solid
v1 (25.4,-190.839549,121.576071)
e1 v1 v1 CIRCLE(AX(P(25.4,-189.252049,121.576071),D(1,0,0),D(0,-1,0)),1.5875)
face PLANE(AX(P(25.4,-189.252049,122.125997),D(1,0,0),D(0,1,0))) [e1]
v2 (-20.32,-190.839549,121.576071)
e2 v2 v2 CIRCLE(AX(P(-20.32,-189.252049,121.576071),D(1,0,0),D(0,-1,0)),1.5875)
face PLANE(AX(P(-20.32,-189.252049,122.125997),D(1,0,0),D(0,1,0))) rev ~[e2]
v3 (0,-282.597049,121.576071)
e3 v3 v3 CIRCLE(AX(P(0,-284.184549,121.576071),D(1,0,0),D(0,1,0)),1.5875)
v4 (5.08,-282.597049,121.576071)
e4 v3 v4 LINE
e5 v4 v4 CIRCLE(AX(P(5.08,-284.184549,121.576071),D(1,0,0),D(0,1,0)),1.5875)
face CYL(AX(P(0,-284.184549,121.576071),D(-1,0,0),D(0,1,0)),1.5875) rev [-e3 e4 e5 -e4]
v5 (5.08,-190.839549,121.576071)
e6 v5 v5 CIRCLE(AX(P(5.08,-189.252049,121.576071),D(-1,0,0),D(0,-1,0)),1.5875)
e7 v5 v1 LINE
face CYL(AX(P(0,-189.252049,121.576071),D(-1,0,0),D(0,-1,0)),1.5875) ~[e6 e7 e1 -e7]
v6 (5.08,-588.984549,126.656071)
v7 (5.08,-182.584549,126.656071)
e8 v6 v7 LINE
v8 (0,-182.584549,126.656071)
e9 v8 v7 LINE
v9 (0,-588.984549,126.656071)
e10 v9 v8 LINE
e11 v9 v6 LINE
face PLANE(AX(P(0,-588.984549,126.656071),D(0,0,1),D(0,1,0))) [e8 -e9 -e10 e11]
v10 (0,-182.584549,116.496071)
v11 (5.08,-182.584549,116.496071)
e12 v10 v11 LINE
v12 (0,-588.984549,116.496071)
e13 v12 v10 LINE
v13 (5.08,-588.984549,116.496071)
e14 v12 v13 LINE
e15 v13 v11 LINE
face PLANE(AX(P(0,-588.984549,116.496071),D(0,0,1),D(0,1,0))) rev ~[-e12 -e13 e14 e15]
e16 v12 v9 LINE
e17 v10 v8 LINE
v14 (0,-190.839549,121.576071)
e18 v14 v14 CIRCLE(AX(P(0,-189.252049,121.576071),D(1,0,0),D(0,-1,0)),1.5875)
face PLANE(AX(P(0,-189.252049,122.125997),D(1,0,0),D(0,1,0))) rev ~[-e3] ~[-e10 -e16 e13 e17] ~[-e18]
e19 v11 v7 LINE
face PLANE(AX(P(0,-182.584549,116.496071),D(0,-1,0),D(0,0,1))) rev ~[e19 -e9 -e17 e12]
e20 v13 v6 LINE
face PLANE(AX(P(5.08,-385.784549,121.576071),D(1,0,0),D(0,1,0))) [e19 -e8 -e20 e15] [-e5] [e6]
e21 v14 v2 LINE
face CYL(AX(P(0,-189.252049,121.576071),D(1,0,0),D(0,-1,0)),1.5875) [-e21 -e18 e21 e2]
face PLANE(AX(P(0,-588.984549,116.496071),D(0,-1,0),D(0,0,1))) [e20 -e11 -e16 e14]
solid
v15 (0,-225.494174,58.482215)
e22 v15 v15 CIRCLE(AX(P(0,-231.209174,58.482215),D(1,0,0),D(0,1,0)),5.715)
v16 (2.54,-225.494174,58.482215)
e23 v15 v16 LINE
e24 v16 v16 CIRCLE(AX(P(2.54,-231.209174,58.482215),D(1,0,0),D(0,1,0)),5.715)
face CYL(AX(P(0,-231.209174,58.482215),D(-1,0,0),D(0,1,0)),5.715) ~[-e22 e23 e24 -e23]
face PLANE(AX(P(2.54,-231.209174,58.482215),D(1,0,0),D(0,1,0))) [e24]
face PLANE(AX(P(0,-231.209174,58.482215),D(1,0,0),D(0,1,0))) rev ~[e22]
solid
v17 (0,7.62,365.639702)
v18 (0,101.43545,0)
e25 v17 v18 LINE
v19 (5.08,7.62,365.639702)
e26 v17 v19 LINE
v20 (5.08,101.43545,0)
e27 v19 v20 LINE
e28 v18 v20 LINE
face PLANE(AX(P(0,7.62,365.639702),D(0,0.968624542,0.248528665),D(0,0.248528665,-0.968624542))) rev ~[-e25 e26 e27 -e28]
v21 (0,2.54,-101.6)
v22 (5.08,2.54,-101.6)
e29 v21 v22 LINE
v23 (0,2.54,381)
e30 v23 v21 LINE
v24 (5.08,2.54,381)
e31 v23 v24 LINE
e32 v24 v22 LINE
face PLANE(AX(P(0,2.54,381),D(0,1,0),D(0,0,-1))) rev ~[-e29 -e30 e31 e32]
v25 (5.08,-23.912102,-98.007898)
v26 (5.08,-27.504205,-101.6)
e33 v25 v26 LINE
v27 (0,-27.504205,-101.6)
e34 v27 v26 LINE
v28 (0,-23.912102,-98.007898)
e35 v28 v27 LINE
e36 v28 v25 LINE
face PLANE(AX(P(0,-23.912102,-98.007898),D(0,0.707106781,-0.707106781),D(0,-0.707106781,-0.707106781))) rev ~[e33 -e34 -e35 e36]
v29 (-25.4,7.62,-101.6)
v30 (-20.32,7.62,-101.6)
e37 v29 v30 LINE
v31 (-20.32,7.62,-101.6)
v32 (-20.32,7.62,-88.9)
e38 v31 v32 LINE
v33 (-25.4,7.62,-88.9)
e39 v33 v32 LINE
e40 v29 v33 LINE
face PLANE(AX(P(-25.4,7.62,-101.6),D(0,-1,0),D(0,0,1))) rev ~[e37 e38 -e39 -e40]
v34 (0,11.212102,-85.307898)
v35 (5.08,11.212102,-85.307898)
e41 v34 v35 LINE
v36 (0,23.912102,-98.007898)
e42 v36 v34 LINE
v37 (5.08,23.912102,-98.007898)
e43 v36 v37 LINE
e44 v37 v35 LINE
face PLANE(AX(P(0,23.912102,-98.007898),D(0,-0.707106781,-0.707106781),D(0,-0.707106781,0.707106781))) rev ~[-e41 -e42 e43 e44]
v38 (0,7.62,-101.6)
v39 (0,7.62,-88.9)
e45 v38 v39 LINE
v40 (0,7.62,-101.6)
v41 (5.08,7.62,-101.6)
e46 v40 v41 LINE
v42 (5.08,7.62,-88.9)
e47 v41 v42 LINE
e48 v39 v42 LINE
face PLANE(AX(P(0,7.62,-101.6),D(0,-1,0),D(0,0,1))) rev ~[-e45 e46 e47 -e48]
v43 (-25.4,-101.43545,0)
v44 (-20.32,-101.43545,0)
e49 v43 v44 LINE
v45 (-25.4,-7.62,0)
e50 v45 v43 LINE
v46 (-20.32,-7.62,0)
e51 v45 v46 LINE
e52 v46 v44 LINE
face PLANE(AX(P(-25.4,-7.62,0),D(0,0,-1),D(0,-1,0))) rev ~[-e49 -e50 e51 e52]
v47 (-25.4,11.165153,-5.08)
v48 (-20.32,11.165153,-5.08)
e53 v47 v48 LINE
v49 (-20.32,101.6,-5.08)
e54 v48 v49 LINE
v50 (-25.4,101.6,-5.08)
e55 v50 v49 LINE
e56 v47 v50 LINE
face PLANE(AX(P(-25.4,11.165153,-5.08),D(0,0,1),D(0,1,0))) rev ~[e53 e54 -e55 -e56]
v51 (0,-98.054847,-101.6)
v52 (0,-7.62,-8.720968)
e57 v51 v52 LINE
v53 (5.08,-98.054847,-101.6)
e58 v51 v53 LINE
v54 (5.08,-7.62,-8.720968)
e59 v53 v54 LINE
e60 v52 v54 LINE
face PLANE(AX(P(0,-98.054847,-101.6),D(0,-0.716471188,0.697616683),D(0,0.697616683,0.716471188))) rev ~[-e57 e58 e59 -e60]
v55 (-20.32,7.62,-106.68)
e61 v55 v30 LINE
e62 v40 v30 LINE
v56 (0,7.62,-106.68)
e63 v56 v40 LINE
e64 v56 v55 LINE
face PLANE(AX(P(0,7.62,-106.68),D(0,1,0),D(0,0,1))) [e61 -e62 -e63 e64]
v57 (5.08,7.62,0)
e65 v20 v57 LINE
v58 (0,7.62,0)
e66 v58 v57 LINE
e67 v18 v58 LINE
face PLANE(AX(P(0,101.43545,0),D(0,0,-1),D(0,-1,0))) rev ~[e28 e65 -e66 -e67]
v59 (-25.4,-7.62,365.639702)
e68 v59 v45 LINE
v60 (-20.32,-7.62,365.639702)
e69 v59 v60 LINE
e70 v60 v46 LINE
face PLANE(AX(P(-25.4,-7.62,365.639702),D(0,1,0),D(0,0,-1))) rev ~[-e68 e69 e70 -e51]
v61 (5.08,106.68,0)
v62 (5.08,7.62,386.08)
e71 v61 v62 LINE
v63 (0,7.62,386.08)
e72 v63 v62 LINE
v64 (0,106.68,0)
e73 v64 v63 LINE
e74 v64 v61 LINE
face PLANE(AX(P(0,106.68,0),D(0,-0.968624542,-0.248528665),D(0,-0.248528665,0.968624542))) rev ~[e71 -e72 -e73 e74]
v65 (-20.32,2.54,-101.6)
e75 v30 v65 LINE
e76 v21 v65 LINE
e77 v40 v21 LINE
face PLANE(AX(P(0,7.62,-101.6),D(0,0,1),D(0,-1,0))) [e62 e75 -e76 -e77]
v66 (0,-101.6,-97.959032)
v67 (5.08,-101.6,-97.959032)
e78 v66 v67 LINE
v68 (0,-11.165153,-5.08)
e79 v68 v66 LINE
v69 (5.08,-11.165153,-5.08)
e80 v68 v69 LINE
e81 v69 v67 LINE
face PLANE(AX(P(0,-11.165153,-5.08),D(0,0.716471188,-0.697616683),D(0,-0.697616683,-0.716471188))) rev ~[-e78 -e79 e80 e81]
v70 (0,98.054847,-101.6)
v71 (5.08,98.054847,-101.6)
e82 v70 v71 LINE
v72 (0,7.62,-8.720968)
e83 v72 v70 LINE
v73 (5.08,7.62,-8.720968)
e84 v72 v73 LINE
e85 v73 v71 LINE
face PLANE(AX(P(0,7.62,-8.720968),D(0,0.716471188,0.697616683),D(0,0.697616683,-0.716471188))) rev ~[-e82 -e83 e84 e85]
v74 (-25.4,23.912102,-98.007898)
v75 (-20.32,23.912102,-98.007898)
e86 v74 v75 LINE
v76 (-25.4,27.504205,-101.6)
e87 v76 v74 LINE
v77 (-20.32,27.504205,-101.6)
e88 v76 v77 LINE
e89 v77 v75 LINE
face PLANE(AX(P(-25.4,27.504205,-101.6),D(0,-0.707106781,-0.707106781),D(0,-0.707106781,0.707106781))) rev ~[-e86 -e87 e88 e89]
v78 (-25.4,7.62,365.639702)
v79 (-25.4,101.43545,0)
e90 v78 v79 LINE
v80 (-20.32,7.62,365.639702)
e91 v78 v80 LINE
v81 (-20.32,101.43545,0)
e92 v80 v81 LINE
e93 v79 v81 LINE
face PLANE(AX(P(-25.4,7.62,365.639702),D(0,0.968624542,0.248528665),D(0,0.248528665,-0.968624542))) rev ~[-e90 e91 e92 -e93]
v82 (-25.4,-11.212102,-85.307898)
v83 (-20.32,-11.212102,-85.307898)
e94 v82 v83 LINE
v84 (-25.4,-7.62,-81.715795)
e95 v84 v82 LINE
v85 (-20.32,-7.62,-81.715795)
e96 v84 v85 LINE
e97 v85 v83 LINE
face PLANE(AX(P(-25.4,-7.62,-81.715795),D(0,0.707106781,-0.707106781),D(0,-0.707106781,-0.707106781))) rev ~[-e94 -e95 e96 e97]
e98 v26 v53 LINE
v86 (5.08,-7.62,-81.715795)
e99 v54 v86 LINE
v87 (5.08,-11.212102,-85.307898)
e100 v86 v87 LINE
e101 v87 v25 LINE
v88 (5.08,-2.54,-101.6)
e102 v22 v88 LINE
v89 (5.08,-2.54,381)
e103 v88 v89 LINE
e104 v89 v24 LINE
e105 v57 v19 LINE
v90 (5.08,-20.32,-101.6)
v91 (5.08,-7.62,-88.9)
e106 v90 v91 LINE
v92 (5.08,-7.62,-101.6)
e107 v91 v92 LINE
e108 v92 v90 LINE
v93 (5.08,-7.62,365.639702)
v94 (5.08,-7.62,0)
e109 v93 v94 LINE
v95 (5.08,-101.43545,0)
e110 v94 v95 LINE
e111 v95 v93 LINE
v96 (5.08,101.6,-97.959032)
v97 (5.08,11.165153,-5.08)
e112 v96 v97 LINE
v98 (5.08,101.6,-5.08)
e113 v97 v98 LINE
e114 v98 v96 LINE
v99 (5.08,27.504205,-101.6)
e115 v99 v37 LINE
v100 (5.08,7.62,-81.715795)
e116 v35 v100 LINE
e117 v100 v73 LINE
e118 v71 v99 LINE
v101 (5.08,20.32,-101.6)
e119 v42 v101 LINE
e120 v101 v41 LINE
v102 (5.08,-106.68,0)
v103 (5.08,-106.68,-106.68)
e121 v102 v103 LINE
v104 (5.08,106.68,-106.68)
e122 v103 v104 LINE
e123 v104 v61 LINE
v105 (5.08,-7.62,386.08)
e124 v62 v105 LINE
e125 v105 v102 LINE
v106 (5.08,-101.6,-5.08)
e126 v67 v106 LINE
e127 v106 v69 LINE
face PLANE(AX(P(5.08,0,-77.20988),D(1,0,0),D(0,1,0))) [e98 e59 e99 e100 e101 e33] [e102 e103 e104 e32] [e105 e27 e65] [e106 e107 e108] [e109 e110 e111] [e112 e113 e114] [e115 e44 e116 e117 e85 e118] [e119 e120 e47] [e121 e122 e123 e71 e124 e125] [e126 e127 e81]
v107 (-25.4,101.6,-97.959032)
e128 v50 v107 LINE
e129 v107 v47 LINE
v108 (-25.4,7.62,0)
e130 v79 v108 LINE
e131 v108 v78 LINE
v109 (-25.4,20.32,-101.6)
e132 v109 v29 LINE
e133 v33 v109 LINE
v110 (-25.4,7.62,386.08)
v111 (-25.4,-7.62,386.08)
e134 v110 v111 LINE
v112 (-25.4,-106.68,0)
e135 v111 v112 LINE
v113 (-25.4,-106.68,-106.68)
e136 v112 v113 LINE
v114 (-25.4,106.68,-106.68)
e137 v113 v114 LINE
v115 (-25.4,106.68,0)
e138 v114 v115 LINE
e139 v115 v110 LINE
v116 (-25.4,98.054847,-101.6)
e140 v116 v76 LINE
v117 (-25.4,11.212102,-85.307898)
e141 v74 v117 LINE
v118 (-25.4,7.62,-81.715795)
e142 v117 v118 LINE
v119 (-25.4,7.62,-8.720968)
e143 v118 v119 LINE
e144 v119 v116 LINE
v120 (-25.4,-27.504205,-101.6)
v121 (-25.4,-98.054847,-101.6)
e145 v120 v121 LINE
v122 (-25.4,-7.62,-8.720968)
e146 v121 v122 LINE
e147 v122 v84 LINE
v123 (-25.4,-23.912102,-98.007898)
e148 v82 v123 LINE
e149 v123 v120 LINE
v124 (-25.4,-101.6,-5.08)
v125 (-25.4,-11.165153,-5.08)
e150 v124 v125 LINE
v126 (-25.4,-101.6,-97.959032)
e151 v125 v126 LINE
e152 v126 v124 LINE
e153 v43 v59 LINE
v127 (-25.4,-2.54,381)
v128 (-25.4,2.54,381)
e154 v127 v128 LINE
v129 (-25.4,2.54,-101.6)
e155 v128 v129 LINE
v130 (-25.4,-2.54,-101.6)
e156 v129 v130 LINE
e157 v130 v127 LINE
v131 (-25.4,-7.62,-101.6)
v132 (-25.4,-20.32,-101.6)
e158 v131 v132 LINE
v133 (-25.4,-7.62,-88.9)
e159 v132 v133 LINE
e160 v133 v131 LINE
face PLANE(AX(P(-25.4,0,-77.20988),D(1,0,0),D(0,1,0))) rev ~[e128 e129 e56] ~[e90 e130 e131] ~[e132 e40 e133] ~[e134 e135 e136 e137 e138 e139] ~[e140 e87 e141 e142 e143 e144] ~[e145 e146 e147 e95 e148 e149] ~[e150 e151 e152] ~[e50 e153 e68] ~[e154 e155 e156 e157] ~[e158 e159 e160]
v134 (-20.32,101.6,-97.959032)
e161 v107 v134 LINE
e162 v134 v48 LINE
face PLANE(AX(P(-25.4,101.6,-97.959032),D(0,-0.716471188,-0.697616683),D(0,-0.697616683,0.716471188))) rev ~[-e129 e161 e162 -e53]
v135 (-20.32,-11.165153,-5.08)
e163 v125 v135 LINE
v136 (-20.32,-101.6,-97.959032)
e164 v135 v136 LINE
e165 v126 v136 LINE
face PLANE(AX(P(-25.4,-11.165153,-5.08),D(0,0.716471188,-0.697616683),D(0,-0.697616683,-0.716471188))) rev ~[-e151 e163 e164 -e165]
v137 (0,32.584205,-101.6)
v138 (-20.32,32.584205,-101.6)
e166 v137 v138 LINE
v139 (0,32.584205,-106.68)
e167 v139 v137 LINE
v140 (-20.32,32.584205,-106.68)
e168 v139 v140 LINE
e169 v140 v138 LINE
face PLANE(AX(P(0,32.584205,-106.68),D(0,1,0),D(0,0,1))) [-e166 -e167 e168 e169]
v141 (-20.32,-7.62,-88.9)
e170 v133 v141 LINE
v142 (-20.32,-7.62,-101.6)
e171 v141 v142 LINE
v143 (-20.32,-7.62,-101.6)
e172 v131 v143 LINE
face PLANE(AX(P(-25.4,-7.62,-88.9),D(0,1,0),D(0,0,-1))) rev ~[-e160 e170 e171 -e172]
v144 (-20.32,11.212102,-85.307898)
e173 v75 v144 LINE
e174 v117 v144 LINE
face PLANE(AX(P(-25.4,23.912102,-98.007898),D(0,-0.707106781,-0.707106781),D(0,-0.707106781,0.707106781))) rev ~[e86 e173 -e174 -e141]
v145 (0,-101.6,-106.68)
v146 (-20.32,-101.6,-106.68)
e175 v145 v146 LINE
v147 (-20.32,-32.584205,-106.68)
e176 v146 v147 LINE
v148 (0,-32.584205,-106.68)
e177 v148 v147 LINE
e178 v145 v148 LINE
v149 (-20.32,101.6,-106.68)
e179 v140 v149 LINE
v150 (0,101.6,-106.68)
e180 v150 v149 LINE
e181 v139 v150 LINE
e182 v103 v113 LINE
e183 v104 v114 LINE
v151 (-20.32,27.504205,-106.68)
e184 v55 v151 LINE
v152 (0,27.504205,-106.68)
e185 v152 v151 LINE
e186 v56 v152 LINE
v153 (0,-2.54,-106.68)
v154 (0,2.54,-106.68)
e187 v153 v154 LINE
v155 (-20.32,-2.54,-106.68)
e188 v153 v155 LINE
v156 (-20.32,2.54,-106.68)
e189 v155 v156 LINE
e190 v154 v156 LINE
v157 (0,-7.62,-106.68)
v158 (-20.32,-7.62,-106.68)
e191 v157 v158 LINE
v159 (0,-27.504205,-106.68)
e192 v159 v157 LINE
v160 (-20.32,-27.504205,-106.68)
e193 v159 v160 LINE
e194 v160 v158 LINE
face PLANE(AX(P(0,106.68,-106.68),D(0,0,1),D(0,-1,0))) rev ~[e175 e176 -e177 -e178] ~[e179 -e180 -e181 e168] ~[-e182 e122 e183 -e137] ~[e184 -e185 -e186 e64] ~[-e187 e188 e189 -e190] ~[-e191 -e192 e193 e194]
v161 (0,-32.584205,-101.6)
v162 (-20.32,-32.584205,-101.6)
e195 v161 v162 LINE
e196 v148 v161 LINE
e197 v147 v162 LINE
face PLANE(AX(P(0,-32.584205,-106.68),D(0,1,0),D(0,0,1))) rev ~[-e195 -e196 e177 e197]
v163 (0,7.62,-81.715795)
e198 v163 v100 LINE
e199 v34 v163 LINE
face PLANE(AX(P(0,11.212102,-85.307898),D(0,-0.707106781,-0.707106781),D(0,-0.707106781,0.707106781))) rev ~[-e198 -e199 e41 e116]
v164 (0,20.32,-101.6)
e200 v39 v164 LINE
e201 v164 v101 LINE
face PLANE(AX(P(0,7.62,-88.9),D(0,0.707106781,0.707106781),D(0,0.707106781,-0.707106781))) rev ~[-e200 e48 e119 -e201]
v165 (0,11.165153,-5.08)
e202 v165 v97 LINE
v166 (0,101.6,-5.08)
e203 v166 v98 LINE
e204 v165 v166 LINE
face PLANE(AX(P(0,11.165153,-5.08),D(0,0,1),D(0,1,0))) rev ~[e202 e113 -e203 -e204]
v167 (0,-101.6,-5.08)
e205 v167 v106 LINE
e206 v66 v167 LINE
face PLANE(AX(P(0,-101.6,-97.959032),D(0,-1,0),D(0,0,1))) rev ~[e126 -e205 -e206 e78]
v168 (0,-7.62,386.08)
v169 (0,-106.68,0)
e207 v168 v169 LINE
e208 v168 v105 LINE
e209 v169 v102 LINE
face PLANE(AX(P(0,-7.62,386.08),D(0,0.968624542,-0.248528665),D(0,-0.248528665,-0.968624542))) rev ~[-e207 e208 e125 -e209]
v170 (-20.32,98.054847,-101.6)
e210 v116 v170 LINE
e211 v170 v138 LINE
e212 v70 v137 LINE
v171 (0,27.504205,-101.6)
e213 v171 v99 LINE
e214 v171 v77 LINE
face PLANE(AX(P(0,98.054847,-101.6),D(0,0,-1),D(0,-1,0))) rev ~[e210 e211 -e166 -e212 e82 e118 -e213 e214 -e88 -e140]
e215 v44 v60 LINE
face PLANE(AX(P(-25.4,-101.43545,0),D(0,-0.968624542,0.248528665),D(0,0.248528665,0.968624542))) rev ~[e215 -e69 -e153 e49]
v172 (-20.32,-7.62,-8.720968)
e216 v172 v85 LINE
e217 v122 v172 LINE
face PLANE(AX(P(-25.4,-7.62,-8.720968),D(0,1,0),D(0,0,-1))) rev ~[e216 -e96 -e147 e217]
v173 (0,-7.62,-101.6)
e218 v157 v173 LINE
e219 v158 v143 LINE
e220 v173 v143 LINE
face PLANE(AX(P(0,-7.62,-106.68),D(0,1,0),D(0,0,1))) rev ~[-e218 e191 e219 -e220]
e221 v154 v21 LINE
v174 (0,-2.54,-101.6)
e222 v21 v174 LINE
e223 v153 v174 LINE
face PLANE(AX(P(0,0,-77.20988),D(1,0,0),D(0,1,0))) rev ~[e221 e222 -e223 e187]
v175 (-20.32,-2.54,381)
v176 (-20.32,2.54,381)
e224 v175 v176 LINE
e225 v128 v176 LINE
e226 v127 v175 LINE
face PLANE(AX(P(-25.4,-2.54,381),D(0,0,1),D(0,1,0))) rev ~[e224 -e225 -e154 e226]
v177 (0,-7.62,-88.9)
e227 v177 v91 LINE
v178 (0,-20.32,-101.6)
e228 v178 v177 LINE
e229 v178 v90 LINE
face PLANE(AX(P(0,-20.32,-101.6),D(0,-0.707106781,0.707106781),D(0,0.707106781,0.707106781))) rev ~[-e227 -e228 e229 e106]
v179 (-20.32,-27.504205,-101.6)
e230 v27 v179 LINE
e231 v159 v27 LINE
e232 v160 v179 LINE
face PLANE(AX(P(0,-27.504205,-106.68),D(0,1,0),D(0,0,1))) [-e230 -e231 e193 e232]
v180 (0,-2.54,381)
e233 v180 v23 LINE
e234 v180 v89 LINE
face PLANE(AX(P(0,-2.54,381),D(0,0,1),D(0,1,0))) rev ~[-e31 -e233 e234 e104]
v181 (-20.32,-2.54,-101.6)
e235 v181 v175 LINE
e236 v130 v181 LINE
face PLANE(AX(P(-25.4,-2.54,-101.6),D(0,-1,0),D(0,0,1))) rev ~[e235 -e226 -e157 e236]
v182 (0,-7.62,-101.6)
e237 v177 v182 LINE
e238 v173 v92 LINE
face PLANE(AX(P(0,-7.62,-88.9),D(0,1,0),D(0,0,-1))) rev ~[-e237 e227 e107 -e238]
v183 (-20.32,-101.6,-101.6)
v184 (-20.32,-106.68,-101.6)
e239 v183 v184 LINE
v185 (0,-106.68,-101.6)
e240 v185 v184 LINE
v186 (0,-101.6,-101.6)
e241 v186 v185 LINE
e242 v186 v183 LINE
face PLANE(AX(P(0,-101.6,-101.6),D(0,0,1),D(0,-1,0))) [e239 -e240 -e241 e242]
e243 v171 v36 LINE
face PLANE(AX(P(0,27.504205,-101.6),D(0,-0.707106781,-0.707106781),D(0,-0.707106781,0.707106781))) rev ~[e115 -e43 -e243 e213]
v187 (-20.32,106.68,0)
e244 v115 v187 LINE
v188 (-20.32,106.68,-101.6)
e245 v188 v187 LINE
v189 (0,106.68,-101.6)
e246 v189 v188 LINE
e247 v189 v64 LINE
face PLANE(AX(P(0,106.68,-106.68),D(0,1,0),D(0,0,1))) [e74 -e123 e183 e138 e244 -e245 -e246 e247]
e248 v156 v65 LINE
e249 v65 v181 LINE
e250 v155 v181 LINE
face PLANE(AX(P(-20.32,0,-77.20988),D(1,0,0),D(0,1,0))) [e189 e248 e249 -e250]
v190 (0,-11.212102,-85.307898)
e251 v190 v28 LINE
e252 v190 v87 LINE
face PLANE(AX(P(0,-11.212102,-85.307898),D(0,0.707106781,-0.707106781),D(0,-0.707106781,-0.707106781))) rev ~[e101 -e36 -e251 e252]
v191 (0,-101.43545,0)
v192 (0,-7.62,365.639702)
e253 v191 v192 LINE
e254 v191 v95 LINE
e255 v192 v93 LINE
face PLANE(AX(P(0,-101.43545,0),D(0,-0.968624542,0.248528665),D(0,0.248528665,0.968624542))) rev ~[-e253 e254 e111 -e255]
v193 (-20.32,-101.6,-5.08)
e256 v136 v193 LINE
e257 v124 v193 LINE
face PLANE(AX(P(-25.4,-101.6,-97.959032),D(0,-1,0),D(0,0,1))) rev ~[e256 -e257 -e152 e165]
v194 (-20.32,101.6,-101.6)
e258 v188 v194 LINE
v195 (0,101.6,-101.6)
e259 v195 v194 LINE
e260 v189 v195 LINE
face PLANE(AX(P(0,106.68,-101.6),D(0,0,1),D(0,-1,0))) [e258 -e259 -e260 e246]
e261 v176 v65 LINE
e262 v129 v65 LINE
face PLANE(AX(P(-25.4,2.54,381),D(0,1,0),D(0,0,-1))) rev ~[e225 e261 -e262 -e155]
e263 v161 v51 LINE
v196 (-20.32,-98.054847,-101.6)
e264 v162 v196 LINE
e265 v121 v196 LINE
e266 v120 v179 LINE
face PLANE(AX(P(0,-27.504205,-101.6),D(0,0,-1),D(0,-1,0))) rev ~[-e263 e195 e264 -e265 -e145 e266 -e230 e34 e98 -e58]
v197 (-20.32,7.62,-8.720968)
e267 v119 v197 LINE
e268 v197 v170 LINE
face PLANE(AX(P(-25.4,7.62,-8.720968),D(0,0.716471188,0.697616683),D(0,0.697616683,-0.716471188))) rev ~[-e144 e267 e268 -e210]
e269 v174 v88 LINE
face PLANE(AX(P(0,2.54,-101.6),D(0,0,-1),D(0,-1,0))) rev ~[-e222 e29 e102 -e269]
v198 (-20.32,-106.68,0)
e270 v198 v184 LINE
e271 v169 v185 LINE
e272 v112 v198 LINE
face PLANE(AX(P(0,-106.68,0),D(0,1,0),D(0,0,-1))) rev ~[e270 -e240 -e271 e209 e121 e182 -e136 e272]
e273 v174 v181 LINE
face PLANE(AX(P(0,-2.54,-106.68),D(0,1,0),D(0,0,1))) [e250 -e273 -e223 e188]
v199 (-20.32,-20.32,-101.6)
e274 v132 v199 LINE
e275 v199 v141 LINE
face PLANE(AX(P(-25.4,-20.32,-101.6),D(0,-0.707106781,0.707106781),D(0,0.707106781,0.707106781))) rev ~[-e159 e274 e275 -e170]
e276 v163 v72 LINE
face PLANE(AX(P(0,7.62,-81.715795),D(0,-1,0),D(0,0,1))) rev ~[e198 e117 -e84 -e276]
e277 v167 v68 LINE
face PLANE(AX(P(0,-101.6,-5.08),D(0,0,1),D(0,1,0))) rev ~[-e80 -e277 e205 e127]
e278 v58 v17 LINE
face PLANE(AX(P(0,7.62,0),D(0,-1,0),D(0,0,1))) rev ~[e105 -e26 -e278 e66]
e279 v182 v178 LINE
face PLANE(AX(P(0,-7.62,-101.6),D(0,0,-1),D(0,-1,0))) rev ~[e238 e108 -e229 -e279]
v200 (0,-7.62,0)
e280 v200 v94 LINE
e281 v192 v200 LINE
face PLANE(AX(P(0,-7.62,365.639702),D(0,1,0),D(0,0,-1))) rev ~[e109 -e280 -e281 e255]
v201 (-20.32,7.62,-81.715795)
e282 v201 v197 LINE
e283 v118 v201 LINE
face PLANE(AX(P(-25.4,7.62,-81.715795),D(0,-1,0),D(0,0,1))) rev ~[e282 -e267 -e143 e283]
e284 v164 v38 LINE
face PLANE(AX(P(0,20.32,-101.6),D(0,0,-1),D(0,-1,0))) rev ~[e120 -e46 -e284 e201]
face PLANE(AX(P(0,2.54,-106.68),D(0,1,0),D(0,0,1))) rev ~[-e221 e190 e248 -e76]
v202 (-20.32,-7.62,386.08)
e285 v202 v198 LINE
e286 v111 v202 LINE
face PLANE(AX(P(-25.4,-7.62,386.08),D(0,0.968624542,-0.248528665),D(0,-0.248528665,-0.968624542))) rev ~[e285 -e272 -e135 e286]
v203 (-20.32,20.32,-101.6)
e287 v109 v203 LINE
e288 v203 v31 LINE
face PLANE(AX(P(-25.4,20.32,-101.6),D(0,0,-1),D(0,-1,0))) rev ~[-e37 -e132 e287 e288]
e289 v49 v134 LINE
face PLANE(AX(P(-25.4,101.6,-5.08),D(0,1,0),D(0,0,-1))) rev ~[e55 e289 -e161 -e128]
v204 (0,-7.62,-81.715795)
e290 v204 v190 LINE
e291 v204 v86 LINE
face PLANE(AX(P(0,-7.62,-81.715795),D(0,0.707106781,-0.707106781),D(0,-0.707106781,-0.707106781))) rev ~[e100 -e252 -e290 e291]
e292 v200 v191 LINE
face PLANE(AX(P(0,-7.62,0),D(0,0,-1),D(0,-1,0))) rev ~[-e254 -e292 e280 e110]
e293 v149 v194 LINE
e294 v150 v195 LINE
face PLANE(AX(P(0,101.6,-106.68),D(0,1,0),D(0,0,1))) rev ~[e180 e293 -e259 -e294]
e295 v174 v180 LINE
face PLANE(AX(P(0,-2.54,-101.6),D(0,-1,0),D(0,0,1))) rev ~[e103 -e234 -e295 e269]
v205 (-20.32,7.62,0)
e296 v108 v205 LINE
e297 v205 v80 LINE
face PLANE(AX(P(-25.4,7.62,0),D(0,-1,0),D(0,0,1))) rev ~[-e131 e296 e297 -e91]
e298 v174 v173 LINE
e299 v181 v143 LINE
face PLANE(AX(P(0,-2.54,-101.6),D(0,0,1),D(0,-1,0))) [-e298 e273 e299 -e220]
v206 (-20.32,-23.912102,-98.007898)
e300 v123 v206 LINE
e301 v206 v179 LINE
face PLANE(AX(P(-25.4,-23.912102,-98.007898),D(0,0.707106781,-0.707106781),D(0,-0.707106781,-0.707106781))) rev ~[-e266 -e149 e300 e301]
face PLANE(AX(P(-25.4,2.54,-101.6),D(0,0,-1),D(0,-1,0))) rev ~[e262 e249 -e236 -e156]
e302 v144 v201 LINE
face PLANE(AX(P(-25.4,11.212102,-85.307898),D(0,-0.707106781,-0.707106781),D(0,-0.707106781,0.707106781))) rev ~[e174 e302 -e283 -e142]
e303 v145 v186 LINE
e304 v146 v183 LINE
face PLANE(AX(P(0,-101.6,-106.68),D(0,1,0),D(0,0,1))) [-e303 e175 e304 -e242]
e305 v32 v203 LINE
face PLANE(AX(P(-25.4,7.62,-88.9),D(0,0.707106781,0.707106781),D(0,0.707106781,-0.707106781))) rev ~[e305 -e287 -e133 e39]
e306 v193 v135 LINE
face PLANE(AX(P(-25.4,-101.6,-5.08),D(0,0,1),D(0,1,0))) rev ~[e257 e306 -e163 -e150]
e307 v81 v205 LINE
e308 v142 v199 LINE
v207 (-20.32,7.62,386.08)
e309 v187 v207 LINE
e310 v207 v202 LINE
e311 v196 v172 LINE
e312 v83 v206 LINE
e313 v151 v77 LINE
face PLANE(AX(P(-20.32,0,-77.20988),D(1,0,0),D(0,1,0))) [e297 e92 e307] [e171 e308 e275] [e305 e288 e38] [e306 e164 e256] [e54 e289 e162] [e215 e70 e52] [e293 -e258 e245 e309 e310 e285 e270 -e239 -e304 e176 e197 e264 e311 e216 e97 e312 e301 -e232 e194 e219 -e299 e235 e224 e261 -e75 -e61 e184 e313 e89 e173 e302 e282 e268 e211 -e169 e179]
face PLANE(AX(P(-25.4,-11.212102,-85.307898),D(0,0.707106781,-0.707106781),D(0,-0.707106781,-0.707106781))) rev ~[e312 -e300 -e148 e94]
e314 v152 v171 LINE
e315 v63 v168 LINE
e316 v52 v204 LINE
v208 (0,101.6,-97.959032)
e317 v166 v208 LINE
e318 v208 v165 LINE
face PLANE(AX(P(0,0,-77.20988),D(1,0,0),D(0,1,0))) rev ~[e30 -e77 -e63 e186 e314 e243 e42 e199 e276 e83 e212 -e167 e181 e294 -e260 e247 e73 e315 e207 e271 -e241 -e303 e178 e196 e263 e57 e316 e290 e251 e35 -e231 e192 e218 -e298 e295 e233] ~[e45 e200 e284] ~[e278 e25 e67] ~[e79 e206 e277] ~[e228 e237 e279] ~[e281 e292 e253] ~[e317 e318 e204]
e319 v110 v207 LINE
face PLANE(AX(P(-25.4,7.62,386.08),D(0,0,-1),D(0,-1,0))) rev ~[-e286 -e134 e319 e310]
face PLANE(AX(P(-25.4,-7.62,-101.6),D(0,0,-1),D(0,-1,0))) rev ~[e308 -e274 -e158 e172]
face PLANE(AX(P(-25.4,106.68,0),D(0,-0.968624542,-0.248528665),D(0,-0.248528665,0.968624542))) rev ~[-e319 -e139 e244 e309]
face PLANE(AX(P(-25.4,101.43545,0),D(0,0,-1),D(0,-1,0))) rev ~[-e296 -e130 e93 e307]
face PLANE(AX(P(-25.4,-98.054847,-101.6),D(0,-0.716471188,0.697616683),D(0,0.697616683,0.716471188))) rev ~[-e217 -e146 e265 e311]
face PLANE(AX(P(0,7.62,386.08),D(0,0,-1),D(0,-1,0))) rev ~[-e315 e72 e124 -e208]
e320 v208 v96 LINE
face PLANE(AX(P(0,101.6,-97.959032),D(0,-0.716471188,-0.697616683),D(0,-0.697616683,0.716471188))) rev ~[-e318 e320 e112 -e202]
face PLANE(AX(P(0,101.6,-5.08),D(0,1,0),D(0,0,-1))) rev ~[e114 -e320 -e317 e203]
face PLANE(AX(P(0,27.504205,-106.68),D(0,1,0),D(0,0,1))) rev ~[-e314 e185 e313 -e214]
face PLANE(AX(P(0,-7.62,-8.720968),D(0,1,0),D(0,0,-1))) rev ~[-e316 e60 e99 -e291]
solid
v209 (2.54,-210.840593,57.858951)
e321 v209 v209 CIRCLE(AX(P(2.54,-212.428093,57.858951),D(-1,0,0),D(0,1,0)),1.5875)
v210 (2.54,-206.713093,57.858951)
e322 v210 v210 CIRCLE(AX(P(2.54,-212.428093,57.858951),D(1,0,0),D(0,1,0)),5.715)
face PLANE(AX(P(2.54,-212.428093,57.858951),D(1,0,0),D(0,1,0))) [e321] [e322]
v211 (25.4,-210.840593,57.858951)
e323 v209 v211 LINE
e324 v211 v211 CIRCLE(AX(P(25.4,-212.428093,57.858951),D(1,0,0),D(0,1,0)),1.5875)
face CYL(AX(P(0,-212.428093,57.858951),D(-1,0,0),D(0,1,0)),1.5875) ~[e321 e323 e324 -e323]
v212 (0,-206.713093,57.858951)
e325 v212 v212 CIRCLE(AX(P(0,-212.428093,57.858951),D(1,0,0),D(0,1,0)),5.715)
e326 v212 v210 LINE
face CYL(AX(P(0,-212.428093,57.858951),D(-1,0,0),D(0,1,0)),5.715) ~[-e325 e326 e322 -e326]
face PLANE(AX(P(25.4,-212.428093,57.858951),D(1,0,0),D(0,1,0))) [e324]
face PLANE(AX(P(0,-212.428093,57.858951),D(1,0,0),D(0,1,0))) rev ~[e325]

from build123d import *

# Parameters (mm, degrees)
F0_W      = 5.08
F0_H      = 5.08
F1_DEPTH  = 5.08
F4_W      = 5.08
F4_H      = 5.08
F5_DEPTH  = 20.32
F6_W      = 406.4
F6_H      = 10.16
F6_R      = 1.5875
F7_DEPTH  = 5.08
F8_R      = 5.715
F8_R_2    = 1.5875
F9_DEPTH  = 2.54
F10_DEPTH = 25.4
F11_R     = 5.715
F12_DEPTH = 2.54
F15_DEPTH = 25.4
F16_DEPTH = 20.32


# Not quite as in the source:
# - the program builds the solid bodies; features that only make, move or delete a surface that nothing else refers to are left out


with BuildPart() as f1:
    # F0 (on Right) → F1 (new body)
    with BuildSketch(Plane.YZ):
        Polygon((2.54, -101.6), (0, -101.6), (-2.54, -101.6), (-7.62, -101.6), (-20.32, -101.6), (-27.5042048969, -101.6), (-98.0548469748, -101.6), (-101.6, -101.6), (-101.6, -97.9590320281), (-101.6, -5.08), (-101.6, 0), (-106.68, 0), (-106.68, -106.68), (0, -106.68), (106.68, -106.68), (106.68, 0), (101.6, 0), (101.6, -5.08), (101.6, -97.9590320281), (101.6, -101.6), (98.0548469748, -101.6), (27.5042048969, -101.6), (20.32, -101.6), (7.62, -101.6), align=None)
        Polygon((101.4354498343, 0), (7.62, 0), (7.62, -5.08), (11.1651530252, -5.08), (101.6, -5.08), (101.6, 0), align=None)
        Polygon((-7.62, -5.08), (-7.62, 0), (-101.4354498343, 0), (-101.6, 0), (-101.6, -5.08), (-11.1651530252, -5.08), align=None)
        Polygon((2.54, 381), (2.54, 0), (7.62, 0), (7.62, 365.6397019183), (7.62, 381), align=None)
        Polygon((-7.62, 0), (-2.54, 0), (-2.54, 381), (-7.62, 381), (-7.62, 365.6397019183), align=None)
        Polygon((-2.54, 381), (2.54, 381), (7.62, 381), (7.62, 386.08), (-7.62, 386.08), (-7.62, 381), align=None)
        Polygon((-2.54, -101.6), (-2.54, -5.08), (-7.62, -5.08), (-7.62, -8.7209679719), (-7.62, -81.7157951031), (-7.62, -88.9), (-7.62, -101.6), align=None)
        Polygon((-7.62, -8.7209679719), (-7.62, -5.08), (-11.1651530252, -5.08), (-101.6, -97.9590320281), (-101.6, -101.6), (-98.0548469748, -101.6), align=None)
        with Locations((5.08, -2.54)):
            Rectangle(F0_W, F0_H)
        with Locations((-5.08, -2.54)):
            Rectangle(F0_W, F0_H)
        Polygon((7.62, -5.08), (2.54, -5.08), (2.54, -101.6), (7.62, -101.6), (7.62, -88.9), (7.62, -81.7157951031), (7.62, -8.7209679719), align=None)
        Polygon((11.1651530252, -5.08), (7.62, -5.08), (7.62, -8.7209679719), (98.0548469748, -101.6), (101.6, -101.6), (101.6, -97.9590320281), align=None)
        Polygon((11.2121024484, -85.3078975516), (7.62, -81.7157951031), (7.62, -88.9), (20.32, -101.6), (27.5042048969, -101.6), (23.9121024484, -98.0078975516), align=None)
        Polygon((-27.5042048969, -101.6), (-20.32, -101.6), (-7.62, -88.9), (-7.62, -81.7157951031), (-11.2121024484, -85.3078975516), (-23.9121024484, -98.0078975516), align=None)
        Polygon((7.62, 365.6397019183), (101.4354498343, 0), (101.6, 0), (106.68, 0), (7.62, 386.08), (7.62, 381), align=None)
        Polygon((-101.6, 0), (-101.4354498343, 0), (-7.62, 365.6397019183), (-7.62, 381), (-7.62, 386.08), (-106.68, 0), align=None)
    extrude(amount=F1_DEPTH)


with BuildPart() as f2_1:
    # F2: copy of F1
    add(f1.part)


with BuildPart() as f2_1_1:
    # F3: moved
    add(f2_1.part.moved(Location((-25.4, 0, 0))))


with BuildPart() as f1_1:
    add(f1.part)

    add(f2_1_1.part)  # F5 merges F2_1
    # F4 (on face) → F5 (join, through all)
    with BuildSketch(Plane(origin=(0, 0, 0), x_dir=(0, -1, 0), z_dir=(-1, 0, 0))):
        with Locations((-104.14, -104.14)):
            Rectangle(F4_W, F4_H)
        with Locations((-30.0442048969, -104.14)):
            Rectangle(F4_W, F4_H)
        with Locations((-5.08, -104.14)):
            Rectangle(F4_W, F4_H)
        with Locations((5.08, -104.14)):
            Rectangle(F4_W, F4_H)
        with Locations((30.0442048969, -104.14)):
            Rectangle(F4_W, F4_H)
        with Locations((104.14, -104.14)):
            Rectangle(F4_W, F4_H)
    extrude(amount=F5_DEPTH)


with BuildPart() as f7:
    # F6 (on Right) → F7 (new body)
    with BuildSketch(Plane.YZ):
        with Locations((-385.7845490456, 121.5760712194)):
            Rectangle(F6_W, F6_H)
        with Locations((-284.1845490456, 121.5760712194)):
            Circle(F6_R, mode=Mode.SUBTRACT)
        with BuildLine():
            ThreePointArc((-190.8395490456, 121.5760712194), (-189.2520490456, 123.1635712194), (-187.6645490456, 121.5760712194))
            ThreePointArc((-187.6645490456, 121.5760712194), (-189.2520490456, 119.9885712194), (-190.8395490456, 121.5760712194))
        make_face(mode=Mode.SUBTRACT)
        with BuildLine():
            ThreePointArc((-190.8395490456, 121.5760712194), (-189.2520490456, 119.9885712194), (-187.6645490456, 121.5760712194))
            Line((-187.6645490456, 121.5760712194), (-190.8395490456, 121.5760712194))
        make_face()
        with BuildLine():
            Line((-190.8395490456, 121.5760712194), (-187.6645490456, 121.5760712194))
            ThreePointArc((-187.6645490456, 121.5760712194), (-189.2520490456, 123.1635712194), (-190.8395490456, 121.5760712194))
        make_face()
    extrude(amount=F7_DEPTH)

    # F6 (on Right) → F15 (join)
    with BuildSketch(Plane.YZ):
        with BuildLine():
            Line((-190.8395490456, 121.5760712194), (-187.6645490456, 121.5760712194))
            ThreePointArc((-187.6645490456, 121.5760712194), (-189.2520490456, 123.1635712194), (-190.8395490456, 121.5760712194))
        make_face()
        with BuildLine():
            ThreePointArc((-190.8395490456, 121.5760712194), (-189.2520490456, 119.9885712194), (-187.6645490456, 121.5760712194))
            Line((-187.6645490456, 121.5760712194), (-190.8395490456, 121.5760712194))
        make_face()
    extrude(amount=F15_DEPTH)

    # F6 (on Right) → F16 (join)
    with BuildSketch(Plane.YZ):
        with BuildLine():
            Line((-190.8395490456, 121.5760712194), (-187.6645490456, 121.5760712194))
            ThreePointArc((-187.6645490456, 121.5760712194), (-189.2520490456, 123.1635712194), (-190.8395490456, 121.5760712194))
        make_face()
        with BuildLine():
            ThreePointArc((-190.8395490456, 121.5760712194), (-189.2520490456, 119.9885712194), (-187.6645490456, 121.5760712194))
            Line((-187.6645490456, 121.5760712194), (-190.8395490456, 121.5760712194))
        make_face()
    extrude(amount=-F16_DEPTH)


with BuildPart() as f9:
    # F8 (on Right) → F9 (new body)
    with BuildSketch(Plane.YZ):
        with Locations((-212.4280929565, 57.8589513898)):
            Circle(F8_R)
        with Locations((-212.4280929565, 57.8589513898)):
            Circle(F8_R_2, mode=Mode.SUBTRACT)
        with Locations((-212.4280929565, 57.8589513898)):
            Circle(F8_R_2)
    extrude(amount=F9_DEPTH)

    # F8 (on Right) → F10 (join)
    with BuildSketch(Plane.YZ):
        with Locations((-212.4280929565, 57.8589513898)):
            Circle(F8_R_2)
    extrude(amount=F10_DEPTH)


with BuildPart() as f12:
    # F11 (on Right) → F12 (new body)
    with BuildSketch(Plane.YZ):
        with Locations((-231.2091737986, 58.4822148085)):
            Circle(F11_R)
    extrude(amount=F12_DEPTH)


solid = Compound([f1_1.part, f7.part, f9.part, f12.part])
